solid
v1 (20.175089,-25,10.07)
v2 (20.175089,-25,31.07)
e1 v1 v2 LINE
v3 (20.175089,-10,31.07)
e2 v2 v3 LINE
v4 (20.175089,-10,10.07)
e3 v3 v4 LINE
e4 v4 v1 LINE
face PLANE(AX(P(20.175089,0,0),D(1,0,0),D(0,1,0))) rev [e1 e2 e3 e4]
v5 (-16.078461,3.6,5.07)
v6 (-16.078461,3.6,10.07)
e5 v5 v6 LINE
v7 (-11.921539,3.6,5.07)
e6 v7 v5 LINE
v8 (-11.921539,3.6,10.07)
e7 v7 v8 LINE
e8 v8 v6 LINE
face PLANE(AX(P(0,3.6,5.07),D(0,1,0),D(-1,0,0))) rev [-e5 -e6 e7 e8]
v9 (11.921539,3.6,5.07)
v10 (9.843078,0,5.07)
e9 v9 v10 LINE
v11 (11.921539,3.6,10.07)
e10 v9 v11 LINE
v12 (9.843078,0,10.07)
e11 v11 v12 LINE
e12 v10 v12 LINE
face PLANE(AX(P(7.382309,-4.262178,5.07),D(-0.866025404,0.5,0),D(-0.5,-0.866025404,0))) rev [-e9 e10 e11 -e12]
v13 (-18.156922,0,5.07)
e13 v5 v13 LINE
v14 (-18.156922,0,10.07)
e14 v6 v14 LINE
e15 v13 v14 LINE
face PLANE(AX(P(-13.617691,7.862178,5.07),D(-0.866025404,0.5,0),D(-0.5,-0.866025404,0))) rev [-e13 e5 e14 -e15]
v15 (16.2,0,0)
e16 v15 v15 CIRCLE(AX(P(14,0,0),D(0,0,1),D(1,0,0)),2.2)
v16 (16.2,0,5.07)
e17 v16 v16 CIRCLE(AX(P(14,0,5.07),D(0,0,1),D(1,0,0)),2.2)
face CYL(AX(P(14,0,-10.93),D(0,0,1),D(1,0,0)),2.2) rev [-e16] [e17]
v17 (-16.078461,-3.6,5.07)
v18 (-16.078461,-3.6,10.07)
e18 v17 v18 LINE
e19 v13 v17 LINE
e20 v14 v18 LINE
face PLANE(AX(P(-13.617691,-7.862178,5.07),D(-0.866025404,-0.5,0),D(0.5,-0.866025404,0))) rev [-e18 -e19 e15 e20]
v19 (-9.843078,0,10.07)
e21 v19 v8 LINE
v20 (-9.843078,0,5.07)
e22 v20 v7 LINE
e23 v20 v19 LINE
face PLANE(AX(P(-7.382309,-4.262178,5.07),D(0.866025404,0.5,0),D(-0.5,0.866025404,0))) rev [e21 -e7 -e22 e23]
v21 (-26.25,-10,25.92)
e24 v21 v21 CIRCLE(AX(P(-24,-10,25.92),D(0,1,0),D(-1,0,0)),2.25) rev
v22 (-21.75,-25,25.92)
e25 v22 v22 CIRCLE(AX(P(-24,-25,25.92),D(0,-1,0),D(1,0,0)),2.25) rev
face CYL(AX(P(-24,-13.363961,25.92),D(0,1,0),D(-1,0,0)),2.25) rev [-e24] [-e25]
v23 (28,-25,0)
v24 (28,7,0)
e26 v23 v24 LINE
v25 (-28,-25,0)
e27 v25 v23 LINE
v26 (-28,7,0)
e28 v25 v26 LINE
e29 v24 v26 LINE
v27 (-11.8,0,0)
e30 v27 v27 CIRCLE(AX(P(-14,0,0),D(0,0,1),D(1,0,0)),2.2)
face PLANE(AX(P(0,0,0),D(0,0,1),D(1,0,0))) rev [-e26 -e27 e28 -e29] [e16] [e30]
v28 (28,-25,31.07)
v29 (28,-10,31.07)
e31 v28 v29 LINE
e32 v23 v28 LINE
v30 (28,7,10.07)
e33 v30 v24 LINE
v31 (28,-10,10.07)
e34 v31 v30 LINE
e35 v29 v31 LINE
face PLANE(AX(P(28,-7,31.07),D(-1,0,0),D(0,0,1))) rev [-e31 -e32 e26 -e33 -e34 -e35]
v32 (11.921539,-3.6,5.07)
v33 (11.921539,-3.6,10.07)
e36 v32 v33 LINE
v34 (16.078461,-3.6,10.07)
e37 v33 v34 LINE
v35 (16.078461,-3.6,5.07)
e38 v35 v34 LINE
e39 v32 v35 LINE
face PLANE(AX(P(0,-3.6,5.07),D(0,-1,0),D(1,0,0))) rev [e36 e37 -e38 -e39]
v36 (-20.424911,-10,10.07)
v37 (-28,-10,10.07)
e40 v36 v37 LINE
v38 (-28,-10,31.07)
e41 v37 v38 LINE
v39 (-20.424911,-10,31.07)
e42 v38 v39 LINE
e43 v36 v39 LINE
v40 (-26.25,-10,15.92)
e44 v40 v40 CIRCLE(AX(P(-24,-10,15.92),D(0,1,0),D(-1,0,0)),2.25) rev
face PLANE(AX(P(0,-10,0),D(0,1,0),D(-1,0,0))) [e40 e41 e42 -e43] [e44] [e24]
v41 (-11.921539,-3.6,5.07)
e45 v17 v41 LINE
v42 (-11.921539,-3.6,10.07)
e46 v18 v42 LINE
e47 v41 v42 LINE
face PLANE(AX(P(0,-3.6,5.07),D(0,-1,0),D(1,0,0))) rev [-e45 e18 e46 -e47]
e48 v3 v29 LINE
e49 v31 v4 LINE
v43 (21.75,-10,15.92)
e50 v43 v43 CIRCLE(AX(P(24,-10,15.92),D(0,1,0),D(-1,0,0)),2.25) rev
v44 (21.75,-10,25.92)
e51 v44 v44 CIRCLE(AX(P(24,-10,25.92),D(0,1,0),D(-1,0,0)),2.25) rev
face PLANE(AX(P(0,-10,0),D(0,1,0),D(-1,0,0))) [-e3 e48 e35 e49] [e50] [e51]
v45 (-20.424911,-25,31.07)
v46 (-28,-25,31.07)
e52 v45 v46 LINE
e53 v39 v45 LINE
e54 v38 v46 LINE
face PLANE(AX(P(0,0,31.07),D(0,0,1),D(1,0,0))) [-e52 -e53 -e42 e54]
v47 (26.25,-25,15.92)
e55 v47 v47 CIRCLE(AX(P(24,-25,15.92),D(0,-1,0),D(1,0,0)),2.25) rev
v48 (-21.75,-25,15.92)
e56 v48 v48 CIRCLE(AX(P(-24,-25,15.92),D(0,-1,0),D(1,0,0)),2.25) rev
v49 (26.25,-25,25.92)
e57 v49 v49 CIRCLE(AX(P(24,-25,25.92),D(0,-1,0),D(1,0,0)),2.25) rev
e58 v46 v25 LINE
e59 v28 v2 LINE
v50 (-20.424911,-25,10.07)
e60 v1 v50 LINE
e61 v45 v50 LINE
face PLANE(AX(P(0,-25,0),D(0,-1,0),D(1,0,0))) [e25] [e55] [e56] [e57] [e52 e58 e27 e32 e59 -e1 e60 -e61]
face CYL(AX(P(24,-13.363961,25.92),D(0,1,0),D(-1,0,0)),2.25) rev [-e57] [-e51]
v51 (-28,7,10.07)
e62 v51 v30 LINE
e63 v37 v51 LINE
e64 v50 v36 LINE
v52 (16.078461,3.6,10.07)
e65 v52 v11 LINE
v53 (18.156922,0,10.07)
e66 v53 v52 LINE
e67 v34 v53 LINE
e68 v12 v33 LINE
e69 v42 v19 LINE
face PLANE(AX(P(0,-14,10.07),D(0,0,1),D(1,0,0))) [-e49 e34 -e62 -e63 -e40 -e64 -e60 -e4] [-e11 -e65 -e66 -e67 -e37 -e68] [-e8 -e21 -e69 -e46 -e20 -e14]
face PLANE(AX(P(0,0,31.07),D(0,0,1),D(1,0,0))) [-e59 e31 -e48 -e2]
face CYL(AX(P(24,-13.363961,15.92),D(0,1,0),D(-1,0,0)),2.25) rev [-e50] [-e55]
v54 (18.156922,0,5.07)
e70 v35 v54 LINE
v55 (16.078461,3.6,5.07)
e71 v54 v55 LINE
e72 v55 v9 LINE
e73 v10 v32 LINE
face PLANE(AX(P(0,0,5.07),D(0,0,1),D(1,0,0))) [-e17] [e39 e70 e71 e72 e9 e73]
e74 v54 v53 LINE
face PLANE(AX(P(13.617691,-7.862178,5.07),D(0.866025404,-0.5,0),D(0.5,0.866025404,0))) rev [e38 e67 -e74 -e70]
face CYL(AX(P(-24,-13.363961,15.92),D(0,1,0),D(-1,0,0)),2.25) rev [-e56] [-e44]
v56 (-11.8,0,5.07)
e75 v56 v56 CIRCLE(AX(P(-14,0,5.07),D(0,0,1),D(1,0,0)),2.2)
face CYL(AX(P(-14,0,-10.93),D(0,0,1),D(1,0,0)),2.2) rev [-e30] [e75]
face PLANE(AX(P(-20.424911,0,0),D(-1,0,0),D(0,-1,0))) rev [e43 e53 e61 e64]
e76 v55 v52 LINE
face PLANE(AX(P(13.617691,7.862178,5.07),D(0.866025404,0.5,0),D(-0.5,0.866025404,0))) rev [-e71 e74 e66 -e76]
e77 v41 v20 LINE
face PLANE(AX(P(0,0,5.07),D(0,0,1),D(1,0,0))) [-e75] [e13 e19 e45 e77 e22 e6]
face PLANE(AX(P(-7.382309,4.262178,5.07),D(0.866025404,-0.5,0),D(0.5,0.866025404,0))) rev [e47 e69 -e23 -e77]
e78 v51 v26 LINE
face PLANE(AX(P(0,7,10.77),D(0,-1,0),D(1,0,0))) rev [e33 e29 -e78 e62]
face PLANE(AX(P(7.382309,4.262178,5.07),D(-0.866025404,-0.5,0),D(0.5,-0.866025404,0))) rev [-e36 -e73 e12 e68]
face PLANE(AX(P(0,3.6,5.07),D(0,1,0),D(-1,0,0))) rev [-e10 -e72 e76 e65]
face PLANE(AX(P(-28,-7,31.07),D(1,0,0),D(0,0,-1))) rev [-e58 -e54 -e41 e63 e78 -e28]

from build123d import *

# Parameters (mm, degrees)
SZKIC1_W                       = 40
SZKIC1_H                       = 14
SZKIC1_R                       = 2
DODANIE_WYCI_GNI_CIE1_DEPTH    = 10.77
SZKIC2_W                       = 56
SZKIC2_H                       = 14
DODANIE_WYCI_GNI_CIE2_DEPTH    = 20.3
SZKIC5_R                       = 2.25
WYTNIJ_WYCI_GNI_CIE2_DEPTH     = 14
SZKIC8_W                       = 56
SZKIC8_H                       = 10.77
DODANIE_WYCI_GNI_CIE3_DEPTH    = 14
WYTNIJ_WYCI_GNI_CIE3_START     = -14
WYTNIJ_WYCI_GNI_CIE3_OUTLINE_W = 42
WYTNIJ_WYCI_GNI_CIE3_OUTLINE_H = 21
WYTNIJ_WYCI_GNI_CIE3_DEPTH     = 14
SZKIC12_R                      = 2.25
DODANIE_WYCI_GNI_CIE4_DEPTH    = 18
WYTNIJ_WYCI_GNI_CIE1_DEPTH     = 5
SZKIC9_R                       = 2.2
WYTNIJ_WYCI_GNI_CIE4_DEPTH     = 21
SZKIC10_W                      = 56
SZKIC10_H                      = 21
WYTNIJ_WYCI_GNI_CIE5_DEPTH     = 17
SZKIC13_W                      = 21
SZKIC13_H                      = 15
DODANIE_WYCI_GNI_CIE5_DEPTH    = 0.7
SZKIC16_W                      = 21
SZKIC16_H                      = 15
DODANIE_WYCI_GNI_CIE7_DEPTH    = 0.7


# Read off the part's stored shape, not the designer's step: Wytnij-wyciągnięcie3
with BuildPart() as part:
    # Szkic1 → Dodanie-wyciągnięcie1 (new body)
    with BuildSketch(Plane.XY):
        Rectangle(SZKIC1_W, SZKIC1_H)
        with Locations((-14, 0)):
            Circle(SZKIC1_R, mode=Mode.SUBTRACT)
        with Locations((14, 0)):
            Circle(SZKIC1_R, mode=Mode.SUBTRACT)
    extrude(amount=DODANIE_WYCI_GNI_CIE1_DEPTH)

    # Szkic2 → Dodanie-wyciągnięcie2 (add)
    with BuildSketch(Plane.XY.offset(10.77)):
        Rectangle(SZKIC2_W, SZKIC2_H)
    extrude(amount=DODANIE_WYCI_GNI_CIE2_DEPTH)

    # Szkic5 → Wytnij-wyciągnięcie2 (cut)
    with BuildSketch(Plane(origin=(0, 7, 0), x_dir=(1, 0, 0), z_dir=(0, 1, 0))):
        with Locations(Location((-24, -15.92, 0), (0, 0, 180))):
            Circle(SZKIC5_R)
        with Locations(Location((24, -15.92, 0), (0, 0, 180))):
            Circle(SZKIC5_R)
        with Locations(Location((24, -25.92, 0), (0, 0, 180))):
            Circle(SZKIC5_R)
        with Locations(Location((-24, -25.92, 0), (0, 0, 180))):
            Circle(SZKIC5_R)
    extrude(amount=-WYTNIJ_WYCI_GNI_CIE2_DEPTH, mode=Mode.SUBTRACT)

    # Szkic8 → Dodanie-wyciągnięcie3 (add)
    with BuildSketch(Plane(origin=(0, 7, 0), x_dir=(1, 0, 0), z_dir=(0, 1, 0))):
        with Locations((0, -5.385)):
            Rectangle(SZKIC8_W, SZKIC8_H)
    extrude(amount=-DODANIE_WYCI_GNI_CIE3_DEPTH)

    # Wytnij-wyciągnięcie3 outline → Wytnij-wyciągnięcie3 (cut)
    with BuildSketch(Plane(origin=(0, 7, 0), x_dir=(1, 0, 0), z_dir=(0, 1, 0)).offset(WYTNIJ_WYCI_GNI_CIE3_START)):
        with Locations((-0.124911353, -20.57)):
            Rectangle(WYTNIJ_WYCI_GNI_CIE3_OUTLINE_W, WYTNIJ_WYCI_GNI_CIE3_OUTLINE_H)
    extrude(amount=WYTNIJ_WYCI_GNI_CIE3_DEPTH, mode=Mode.SUBTRACT)

    # Szkic12 → Dodanie-wyciągnięcie4 (add)
    with BuildSketch(Plane.XZ.offset(7)):
        Polygon((20.875088647, 31.07), (20.875088647, 10.07), (-21.124911353, 10.07), (-21.124911353, 31.07), (-28, 31.07), (-28, 0), (28, 0), (28, 31.07), align=None)
        with Locations(Location((-24, 25.92, 0), (0, 0, 180))):
            Circle(SZKIC12_R, mode=Mode.SUBTRACT)
        with Locations(Location((24, 25.92, 0), (0, 0, 180))):
            Circle(SZKIC12_R, mode=Mode.SUBTRACT)
        with Locations(Location((-24, 15.92, 0), (0, 0, 180))):
            Circle(SZKIC12_R, mode=Mode.SUBTRACT)
        with Locations(Location((24, 15.92, 0), (0, 0, 180))):
            Circle(SZKIC12_R, mode=Mode.SUBTRACT)
    extrude(amount=DODANIE_WYCI_GNI_CIE4_DEPTH)

    # Szkic4 → Wytnij-wyciągnięcie1 (cut)
    with BuildSketch(Plane.XY.offset(10.07)):
        Polygon((-16.078460969, 3.6), (-18.156921938, 0), (-16.078460969, -3.6), (-11.921539031, -3.6), (-9.843078062, 0), (-11.921539031, 3.6), align=None)
        Polygon((11.921539031, 3.6), (9.843078062, 0), (11.921539031, -3.6), (16.078460969, -3.6), (18.156921938, 0), (16.078460969, 3.6), align=None)
    extrude(amount=-WYTNIJ_WYCI_GNI_CIE1_DEPTH, mode=Mode.SUBTRACT)

    # Szkic9 → Wytnij-wyciągnięcie4 (cut)
    with BuildSketch(Plane.XY.offset(10.07)):
        with Locations((-14, 0)):
            Circle(SZKIC9_R)
        with Locations((14, 0)):
            Circle(SZKIC9_R)
    extrude(amount=-WYTNIJ_WYCI_GNI_CIE4_DEPTH, mode=Mode.SUBTRACT)

    # Szkic10 → Wytnij-wyciągnięcie5 (cut)
    with BuildSketch(Plane(origin=(0, 7, 0), x_dir=(1, 0, 0), z_dir=(0, 1, 0))):
        with Locations((0, -20.57)):
            Rectangle(SZKIC10_W, SZKIC10_H)
    extrude(amount=-WYTNIJ_WYCI_GNI_CIE5_DEPTH, mode=Mode.SUBTRACT)

    # Szkic13 → Dodanie-wyciągnięcie5 (add)
    with BuildSketch(Plane(origin=(-21.124911353, 0, 0), x_dir=(0, 0, -1), z_dir=(1, 0, 0))):
        with Locations((-20.57, -17.5)):
            Rectangle(SZKIC13_W, SZKIC13_H)
    extrude(amount=DODANIE_WYCI_GNI_CIE5_DEPTH)

    # Szkic16 → Dodanie-wyciągnięcie7 (add)
    with BuildSketch(Plane.ZY.offset(-20.875088647)):
        with Locations((20.57, -17.5)):
            Rectangle(SZKIC16_W, SZKIC16_H)
    extrude(amount=DODANIE_WYCI_GNI_CIE7_DEPTH)


solid = part.part
